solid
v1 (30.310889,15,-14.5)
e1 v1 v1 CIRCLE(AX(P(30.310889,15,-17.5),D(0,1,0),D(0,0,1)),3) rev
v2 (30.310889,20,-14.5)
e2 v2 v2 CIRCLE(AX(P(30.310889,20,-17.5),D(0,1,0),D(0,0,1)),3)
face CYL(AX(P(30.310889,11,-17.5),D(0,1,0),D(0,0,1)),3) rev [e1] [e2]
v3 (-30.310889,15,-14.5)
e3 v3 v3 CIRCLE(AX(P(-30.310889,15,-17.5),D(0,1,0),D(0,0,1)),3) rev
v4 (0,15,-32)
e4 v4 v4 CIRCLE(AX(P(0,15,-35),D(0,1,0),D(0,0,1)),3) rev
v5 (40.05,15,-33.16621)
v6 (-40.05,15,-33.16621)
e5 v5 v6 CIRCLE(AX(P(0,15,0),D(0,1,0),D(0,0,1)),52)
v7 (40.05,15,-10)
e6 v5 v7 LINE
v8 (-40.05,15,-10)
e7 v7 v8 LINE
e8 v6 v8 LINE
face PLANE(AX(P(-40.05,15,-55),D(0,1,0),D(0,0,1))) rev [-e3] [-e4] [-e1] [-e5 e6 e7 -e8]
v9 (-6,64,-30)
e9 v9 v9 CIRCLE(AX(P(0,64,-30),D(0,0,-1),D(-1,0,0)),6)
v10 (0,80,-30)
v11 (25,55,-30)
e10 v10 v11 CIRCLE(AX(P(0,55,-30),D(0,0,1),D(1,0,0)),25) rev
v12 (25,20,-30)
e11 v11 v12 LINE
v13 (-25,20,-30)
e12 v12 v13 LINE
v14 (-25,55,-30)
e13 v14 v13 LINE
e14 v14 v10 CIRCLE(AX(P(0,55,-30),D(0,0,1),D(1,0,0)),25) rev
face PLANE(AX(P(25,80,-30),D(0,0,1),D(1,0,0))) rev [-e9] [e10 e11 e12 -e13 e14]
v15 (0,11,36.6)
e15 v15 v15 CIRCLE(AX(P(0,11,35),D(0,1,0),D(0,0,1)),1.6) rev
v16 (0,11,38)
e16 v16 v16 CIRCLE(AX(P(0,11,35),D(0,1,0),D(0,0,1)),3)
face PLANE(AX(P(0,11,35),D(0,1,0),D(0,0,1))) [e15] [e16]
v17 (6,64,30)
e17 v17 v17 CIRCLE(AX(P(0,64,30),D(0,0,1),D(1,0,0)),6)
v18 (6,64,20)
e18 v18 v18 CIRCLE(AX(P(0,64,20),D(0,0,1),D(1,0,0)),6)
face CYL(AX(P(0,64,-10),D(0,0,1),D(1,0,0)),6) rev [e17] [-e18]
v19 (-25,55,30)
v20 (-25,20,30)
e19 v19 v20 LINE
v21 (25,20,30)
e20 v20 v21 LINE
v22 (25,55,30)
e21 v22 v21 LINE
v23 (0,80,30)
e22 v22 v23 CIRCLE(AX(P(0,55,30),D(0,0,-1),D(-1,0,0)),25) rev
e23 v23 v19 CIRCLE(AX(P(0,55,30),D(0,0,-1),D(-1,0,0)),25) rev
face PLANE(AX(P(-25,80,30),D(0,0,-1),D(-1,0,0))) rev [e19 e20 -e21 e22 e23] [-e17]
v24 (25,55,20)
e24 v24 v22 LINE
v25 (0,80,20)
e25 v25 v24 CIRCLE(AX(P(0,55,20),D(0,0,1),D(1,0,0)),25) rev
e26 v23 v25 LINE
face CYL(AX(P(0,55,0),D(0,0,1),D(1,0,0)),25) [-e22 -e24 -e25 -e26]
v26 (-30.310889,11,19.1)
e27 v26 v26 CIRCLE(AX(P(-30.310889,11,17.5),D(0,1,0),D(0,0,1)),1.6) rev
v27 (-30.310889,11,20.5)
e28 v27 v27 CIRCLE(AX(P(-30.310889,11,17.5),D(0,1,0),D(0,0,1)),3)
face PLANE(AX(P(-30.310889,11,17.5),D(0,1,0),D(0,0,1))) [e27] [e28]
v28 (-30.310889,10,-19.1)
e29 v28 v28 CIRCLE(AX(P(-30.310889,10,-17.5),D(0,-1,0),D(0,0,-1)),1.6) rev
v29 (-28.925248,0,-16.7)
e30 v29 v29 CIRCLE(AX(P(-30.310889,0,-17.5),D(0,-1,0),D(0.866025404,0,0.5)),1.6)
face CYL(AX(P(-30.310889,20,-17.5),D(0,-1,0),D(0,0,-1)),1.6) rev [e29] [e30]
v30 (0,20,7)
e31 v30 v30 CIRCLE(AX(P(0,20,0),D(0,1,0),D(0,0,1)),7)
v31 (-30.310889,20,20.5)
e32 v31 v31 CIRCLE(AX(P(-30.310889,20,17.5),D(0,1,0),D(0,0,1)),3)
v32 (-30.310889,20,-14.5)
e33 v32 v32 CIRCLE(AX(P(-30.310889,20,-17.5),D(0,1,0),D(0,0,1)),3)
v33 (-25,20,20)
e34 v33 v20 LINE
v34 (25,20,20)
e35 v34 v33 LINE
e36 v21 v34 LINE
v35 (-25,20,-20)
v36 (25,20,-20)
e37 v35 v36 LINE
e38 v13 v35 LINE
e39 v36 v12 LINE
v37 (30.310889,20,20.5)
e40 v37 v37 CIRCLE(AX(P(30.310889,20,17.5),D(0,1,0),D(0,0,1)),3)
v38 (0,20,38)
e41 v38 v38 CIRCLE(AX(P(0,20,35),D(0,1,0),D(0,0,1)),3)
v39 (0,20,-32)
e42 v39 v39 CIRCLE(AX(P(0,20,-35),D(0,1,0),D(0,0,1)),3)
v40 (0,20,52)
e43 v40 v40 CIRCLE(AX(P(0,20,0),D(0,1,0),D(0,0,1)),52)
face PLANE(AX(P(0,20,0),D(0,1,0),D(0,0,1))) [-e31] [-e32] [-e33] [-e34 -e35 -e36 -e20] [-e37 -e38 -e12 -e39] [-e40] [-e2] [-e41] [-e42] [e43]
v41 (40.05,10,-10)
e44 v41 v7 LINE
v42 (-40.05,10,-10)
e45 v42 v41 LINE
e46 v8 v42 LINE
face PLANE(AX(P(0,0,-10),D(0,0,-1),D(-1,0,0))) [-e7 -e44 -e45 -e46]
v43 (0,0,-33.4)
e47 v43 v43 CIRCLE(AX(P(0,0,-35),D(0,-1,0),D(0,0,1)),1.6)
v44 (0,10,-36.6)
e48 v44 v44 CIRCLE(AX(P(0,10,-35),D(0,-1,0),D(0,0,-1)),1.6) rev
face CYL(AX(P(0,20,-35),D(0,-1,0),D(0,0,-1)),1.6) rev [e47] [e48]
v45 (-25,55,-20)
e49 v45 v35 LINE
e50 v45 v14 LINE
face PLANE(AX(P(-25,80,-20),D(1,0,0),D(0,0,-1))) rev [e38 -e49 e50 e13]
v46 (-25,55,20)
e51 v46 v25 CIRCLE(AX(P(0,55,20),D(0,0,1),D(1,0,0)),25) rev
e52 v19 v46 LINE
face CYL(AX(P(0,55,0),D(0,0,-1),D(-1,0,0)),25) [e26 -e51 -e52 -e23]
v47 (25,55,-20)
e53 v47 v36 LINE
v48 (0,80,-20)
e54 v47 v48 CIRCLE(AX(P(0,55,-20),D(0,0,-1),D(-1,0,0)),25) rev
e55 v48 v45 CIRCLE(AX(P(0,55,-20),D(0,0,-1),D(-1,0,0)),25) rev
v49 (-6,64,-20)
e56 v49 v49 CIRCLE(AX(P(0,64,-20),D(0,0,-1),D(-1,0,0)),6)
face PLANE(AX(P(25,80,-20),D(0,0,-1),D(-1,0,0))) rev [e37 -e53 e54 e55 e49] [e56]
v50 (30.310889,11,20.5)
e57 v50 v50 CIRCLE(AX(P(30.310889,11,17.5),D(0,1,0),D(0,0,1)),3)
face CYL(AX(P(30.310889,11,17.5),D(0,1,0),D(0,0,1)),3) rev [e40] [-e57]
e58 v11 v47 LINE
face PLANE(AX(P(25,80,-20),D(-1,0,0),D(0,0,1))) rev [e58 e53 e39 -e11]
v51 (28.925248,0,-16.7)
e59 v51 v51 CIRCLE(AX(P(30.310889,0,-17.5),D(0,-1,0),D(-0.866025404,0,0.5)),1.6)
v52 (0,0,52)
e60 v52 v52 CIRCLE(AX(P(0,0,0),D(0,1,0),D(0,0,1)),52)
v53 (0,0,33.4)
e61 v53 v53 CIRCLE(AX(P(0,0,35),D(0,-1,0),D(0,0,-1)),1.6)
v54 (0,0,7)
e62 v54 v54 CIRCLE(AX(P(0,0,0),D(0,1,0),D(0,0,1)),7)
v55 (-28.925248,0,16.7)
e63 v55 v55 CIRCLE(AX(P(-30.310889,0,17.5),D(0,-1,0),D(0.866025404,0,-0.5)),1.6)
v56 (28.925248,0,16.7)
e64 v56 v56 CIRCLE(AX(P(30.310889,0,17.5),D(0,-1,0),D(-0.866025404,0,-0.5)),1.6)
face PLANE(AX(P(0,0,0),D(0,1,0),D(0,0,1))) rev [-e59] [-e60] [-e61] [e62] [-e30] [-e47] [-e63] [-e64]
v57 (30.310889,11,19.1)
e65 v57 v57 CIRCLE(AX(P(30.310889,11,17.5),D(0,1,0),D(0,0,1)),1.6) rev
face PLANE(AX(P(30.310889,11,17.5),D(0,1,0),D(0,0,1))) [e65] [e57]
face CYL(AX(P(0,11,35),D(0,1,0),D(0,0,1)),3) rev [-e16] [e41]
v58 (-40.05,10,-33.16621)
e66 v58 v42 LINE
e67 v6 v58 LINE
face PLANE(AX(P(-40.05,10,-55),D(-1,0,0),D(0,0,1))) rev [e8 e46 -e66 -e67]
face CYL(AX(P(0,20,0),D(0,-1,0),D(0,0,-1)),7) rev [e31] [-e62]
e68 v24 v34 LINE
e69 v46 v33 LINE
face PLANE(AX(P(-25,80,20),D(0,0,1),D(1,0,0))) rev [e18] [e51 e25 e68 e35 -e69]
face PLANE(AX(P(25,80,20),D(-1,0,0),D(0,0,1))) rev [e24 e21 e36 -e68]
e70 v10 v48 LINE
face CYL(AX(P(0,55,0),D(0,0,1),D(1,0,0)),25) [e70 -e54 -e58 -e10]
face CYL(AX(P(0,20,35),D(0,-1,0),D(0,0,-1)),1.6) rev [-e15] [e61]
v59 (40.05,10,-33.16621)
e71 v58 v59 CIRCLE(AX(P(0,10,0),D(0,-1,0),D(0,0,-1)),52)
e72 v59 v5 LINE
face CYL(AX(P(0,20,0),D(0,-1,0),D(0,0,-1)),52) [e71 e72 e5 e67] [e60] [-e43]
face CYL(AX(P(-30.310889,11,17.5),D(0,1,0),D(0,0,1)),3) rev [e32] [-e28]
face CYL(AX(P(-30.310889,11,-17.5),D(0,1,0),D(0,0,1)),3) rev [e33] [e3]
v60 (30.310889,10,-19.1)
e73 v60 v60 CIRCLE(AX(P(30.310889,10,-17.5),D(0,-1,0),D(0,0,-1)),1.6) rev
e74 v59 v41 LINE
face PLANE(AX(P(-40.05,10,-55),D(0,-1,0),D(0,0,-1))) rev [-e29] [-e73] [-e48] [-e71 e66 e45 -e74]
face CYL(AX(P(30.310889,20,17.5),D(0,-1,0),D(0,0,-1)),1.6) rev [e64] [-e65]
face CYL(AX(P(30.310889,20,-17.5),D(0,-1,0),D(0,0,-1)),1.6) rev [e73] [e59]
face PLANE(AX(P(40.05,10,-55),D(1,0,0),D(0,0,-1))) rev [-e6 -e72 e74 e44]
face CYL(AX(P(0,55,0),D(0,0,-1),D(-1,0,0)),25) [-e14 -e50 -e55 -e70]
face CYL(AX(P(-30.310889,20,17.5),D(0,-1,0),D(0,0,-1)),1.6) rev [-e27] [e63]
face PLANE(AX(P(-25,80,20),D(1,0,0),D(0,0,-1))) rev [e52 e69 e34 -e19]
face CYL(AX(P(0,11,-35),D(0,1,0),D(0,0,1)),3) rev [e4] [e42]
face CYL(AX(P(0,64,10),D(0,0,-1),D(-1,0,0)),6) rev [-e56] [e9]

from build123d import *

# Parameters (mm, degrees)
ESQUISSE1_R                        = 52
ESQUISSE1_R_2                      = 7
BOSS_EXTRU_1_DEPTH                 = 20
ESQUISSE2_W                        = 50
ESQUISSE2_H                        = 10
BOSS_EXTRU_2_DEPTH                 = 60
CONG_1_R                           = 25
ESQUISSE3_R                        = 6
ENL_V_MAT_EXTRU_1_DEPTH            = 40
R_P_TITION_CIRCULAIRE1_COUNT       = 2
CONG_1_OF_R_P_TITION_CIRCULAIRE1_R = 25
ESQUISSE5_R                        = 1.6
ENL_V_MAT_EXTRU_2_DEPTH            = 20
R_P_TITION_CIRCULAIRE2_COUNT       = 6
ESQUISSE6_R                        = 3
ENL_V_MAT_EXTRU_3_DEPTH            = 9
ENL_V_START                        = -10
ESQUISSE7_W                        = 80.1
ESQUISSE7_H                        = 5
ENL_V_MAT_EXTRU_4_DEPTH            = 45


with BuildPart() as part:
    # Esquisse1 → Boss.-Extru.1 (new body)
    with BuildSketch(Plane(origin=(0, 0, 0), x_dir=(1, 0, 0), z_dir=(0, 1, 0))):
        with Locations(Location((0, 0, 0), (0, 0, 270))):
            Circle(ESQUISSE1_R)
        with Locations(Location((0, 0, 0), (0, 0, 270))):
            Circle(ESQUISSE1_R_2, mode=Mode.SUBTRACT)
    extrude(amount=BOSS_EXTRU_1_DEPTH)

    # Esquisse2 → Boss.-Extru.2 (add)
    with BuildSketch(Plane(origin=(0, 20, 0), x_dir=(1, 0, 0), z_dir=(0, 1, 0))):
        with Locations((0, 25)):
            Rectangle(ESQUISSE2_W, ESQUISSE2_H)
    boss_extru_2 = extrude(amount=BOSS_EXTRU_2_DEPTH)

    # Congé1
    cong_1_edges = [part.edges().sort_by_distance(p)[0] for p in [
        (25, 80, -25),
        (-25, 80, -25),
    ]]
    fillet(cong_1_edges, radius=CONG_1_R - 0.0001)  # a hair under: the kernel refuses the full size

    # Esquisse3 → Enlèv. mat.-Extru.1 (cut)
    with BuildSketch(Plane(origin=(0, 0, -30), x_dir=(-1, 0, 0), z_dir=(0, 0, -1))):
        with Locations((0, 64)):
            Circle(ESQUISSE3_R)
    enl_v_mat_extru_1 = extrude(amount=-ENL_V_MAT_EXTRU_1_DEPTH, mode=Mode.SUBTRACT)

    # Répétition circulaire1: Boss.-Extru.2, Enlèv. mat.-Extru.1 ×2 about axis
    r_p_tition_circulaire1_axis = Axis((0, 0, 0), (0, 1, 0))
    add([boss_extru_2.rotate(r_p_tition_circulaire1_axis, i * 360 / R_P_TITION_CIRCULAIRE1_COUNT) for i in range(1, R_P_TITION_CIRCULAIRE1_COUNT)])
    add([enl_v_mat_extru_1.rotate(r_p_tition_circulaire1_axis, i * 360 / R_P_TITION_CIRCULAIRE1_COUNT) for i in range(1, R_P_TITION_CIRCULAIRE1_COUNT)], mode=Mode.SUBTRACT)

    # Congé1 of Répétition circulaire1
    cong_1_of_r_p_tition_circulaire1_edges = [part.edges().sort_by_distance(p)[0] for p in [
        (-25, 80, 25),
        (25, 80, 25),
    ]]
    fillet(cong_1_of_r_p_tition_circulaire1_edges, radius=CONG_1_OF_R_P_TITION_CIRCULAIRE1_R - 0.0001)  # a hair under: the kernel refuses the full size

    # Esquisse5 → Enlèv. mat.-Extru.2 (cut)
    with BuildSketch(Plane.XZ):
        with Locations(Location((0, 35, 0), (0, 0, 270))):
            Circle(ESQUISSE5_R)
    enl_v_mat_extru_2 = extrude(amount=-ENL_V_MAT_EXTRU_2_DEPTH, mode=Mode.SUBTRACT)

    # Répétition circulaire2: Enlèv. mat.-Extru.2 ×6 about axis
    r_p_tition_circulaire2_axis = Axis((0, 0, 0), (0, 1, 0))
    for i in range(1, R_P_TITION_CIRCULAIRE2_COUNT):
        add(enl_v_mat_extru_2.rotate(r_p_tition_circulaire2_axis, i * 360 / R_P_TITION_CIRCULAIRE2_COUNT), mode=Mode.SUBTRACT)

    # Esquisse6 → Enlèv. mat.-Extru.3 (cut)
    with BuildSketch(Plane(origin=(0, 20, 0), x_dir=(1, 0, 0), z_dir=(0, 1, 0))):
        with Locations(Location((30.310889132, 17.5, 0), (0, 0, 270))):
            Circle(ESQUISSE6_R)
        with Locations(Location((30.310889132, -17.5, 0), (0, 0, 270))):
            Circle(ESQUISSE6_R)
        with Locations(Location((0, -35, 0), (0, 0, 270))):
            Circle(ESQUISSE6_R)
        with Locations(Location((-30.310889132, -17.5, 0), (0, 0, 270))):
            Circle(ESQUISSE6_R)
        with Locations(Location((-30.310889132, 17.5, 0), (0, 0, 270))):
            Circle(ESQUISSE6_R)
        with Locations(Location((0, 35, 0), (0, 0, 270))):
            Circle(ESQUISSE6_R)
    extrude(amount=-ENL_V_MAT_EXTRU_3_DEPTH, mode=Mode.SUBTRACT)

    # Esquisse7 → Enlèv. mat.-Extru.4 (cut)
    with BuildSketch(Plane.XY.offset(ENL_V_START)):
        with Locations((0, 12.5)):
            Rectangle(ESQUISSE7_W, ESQUISSE7_H)
    extrude(amount=-ENL_V_MAT_EXTRU_4_DEPTH, mode=Mode.SUBTRACT)


solid = part.part
